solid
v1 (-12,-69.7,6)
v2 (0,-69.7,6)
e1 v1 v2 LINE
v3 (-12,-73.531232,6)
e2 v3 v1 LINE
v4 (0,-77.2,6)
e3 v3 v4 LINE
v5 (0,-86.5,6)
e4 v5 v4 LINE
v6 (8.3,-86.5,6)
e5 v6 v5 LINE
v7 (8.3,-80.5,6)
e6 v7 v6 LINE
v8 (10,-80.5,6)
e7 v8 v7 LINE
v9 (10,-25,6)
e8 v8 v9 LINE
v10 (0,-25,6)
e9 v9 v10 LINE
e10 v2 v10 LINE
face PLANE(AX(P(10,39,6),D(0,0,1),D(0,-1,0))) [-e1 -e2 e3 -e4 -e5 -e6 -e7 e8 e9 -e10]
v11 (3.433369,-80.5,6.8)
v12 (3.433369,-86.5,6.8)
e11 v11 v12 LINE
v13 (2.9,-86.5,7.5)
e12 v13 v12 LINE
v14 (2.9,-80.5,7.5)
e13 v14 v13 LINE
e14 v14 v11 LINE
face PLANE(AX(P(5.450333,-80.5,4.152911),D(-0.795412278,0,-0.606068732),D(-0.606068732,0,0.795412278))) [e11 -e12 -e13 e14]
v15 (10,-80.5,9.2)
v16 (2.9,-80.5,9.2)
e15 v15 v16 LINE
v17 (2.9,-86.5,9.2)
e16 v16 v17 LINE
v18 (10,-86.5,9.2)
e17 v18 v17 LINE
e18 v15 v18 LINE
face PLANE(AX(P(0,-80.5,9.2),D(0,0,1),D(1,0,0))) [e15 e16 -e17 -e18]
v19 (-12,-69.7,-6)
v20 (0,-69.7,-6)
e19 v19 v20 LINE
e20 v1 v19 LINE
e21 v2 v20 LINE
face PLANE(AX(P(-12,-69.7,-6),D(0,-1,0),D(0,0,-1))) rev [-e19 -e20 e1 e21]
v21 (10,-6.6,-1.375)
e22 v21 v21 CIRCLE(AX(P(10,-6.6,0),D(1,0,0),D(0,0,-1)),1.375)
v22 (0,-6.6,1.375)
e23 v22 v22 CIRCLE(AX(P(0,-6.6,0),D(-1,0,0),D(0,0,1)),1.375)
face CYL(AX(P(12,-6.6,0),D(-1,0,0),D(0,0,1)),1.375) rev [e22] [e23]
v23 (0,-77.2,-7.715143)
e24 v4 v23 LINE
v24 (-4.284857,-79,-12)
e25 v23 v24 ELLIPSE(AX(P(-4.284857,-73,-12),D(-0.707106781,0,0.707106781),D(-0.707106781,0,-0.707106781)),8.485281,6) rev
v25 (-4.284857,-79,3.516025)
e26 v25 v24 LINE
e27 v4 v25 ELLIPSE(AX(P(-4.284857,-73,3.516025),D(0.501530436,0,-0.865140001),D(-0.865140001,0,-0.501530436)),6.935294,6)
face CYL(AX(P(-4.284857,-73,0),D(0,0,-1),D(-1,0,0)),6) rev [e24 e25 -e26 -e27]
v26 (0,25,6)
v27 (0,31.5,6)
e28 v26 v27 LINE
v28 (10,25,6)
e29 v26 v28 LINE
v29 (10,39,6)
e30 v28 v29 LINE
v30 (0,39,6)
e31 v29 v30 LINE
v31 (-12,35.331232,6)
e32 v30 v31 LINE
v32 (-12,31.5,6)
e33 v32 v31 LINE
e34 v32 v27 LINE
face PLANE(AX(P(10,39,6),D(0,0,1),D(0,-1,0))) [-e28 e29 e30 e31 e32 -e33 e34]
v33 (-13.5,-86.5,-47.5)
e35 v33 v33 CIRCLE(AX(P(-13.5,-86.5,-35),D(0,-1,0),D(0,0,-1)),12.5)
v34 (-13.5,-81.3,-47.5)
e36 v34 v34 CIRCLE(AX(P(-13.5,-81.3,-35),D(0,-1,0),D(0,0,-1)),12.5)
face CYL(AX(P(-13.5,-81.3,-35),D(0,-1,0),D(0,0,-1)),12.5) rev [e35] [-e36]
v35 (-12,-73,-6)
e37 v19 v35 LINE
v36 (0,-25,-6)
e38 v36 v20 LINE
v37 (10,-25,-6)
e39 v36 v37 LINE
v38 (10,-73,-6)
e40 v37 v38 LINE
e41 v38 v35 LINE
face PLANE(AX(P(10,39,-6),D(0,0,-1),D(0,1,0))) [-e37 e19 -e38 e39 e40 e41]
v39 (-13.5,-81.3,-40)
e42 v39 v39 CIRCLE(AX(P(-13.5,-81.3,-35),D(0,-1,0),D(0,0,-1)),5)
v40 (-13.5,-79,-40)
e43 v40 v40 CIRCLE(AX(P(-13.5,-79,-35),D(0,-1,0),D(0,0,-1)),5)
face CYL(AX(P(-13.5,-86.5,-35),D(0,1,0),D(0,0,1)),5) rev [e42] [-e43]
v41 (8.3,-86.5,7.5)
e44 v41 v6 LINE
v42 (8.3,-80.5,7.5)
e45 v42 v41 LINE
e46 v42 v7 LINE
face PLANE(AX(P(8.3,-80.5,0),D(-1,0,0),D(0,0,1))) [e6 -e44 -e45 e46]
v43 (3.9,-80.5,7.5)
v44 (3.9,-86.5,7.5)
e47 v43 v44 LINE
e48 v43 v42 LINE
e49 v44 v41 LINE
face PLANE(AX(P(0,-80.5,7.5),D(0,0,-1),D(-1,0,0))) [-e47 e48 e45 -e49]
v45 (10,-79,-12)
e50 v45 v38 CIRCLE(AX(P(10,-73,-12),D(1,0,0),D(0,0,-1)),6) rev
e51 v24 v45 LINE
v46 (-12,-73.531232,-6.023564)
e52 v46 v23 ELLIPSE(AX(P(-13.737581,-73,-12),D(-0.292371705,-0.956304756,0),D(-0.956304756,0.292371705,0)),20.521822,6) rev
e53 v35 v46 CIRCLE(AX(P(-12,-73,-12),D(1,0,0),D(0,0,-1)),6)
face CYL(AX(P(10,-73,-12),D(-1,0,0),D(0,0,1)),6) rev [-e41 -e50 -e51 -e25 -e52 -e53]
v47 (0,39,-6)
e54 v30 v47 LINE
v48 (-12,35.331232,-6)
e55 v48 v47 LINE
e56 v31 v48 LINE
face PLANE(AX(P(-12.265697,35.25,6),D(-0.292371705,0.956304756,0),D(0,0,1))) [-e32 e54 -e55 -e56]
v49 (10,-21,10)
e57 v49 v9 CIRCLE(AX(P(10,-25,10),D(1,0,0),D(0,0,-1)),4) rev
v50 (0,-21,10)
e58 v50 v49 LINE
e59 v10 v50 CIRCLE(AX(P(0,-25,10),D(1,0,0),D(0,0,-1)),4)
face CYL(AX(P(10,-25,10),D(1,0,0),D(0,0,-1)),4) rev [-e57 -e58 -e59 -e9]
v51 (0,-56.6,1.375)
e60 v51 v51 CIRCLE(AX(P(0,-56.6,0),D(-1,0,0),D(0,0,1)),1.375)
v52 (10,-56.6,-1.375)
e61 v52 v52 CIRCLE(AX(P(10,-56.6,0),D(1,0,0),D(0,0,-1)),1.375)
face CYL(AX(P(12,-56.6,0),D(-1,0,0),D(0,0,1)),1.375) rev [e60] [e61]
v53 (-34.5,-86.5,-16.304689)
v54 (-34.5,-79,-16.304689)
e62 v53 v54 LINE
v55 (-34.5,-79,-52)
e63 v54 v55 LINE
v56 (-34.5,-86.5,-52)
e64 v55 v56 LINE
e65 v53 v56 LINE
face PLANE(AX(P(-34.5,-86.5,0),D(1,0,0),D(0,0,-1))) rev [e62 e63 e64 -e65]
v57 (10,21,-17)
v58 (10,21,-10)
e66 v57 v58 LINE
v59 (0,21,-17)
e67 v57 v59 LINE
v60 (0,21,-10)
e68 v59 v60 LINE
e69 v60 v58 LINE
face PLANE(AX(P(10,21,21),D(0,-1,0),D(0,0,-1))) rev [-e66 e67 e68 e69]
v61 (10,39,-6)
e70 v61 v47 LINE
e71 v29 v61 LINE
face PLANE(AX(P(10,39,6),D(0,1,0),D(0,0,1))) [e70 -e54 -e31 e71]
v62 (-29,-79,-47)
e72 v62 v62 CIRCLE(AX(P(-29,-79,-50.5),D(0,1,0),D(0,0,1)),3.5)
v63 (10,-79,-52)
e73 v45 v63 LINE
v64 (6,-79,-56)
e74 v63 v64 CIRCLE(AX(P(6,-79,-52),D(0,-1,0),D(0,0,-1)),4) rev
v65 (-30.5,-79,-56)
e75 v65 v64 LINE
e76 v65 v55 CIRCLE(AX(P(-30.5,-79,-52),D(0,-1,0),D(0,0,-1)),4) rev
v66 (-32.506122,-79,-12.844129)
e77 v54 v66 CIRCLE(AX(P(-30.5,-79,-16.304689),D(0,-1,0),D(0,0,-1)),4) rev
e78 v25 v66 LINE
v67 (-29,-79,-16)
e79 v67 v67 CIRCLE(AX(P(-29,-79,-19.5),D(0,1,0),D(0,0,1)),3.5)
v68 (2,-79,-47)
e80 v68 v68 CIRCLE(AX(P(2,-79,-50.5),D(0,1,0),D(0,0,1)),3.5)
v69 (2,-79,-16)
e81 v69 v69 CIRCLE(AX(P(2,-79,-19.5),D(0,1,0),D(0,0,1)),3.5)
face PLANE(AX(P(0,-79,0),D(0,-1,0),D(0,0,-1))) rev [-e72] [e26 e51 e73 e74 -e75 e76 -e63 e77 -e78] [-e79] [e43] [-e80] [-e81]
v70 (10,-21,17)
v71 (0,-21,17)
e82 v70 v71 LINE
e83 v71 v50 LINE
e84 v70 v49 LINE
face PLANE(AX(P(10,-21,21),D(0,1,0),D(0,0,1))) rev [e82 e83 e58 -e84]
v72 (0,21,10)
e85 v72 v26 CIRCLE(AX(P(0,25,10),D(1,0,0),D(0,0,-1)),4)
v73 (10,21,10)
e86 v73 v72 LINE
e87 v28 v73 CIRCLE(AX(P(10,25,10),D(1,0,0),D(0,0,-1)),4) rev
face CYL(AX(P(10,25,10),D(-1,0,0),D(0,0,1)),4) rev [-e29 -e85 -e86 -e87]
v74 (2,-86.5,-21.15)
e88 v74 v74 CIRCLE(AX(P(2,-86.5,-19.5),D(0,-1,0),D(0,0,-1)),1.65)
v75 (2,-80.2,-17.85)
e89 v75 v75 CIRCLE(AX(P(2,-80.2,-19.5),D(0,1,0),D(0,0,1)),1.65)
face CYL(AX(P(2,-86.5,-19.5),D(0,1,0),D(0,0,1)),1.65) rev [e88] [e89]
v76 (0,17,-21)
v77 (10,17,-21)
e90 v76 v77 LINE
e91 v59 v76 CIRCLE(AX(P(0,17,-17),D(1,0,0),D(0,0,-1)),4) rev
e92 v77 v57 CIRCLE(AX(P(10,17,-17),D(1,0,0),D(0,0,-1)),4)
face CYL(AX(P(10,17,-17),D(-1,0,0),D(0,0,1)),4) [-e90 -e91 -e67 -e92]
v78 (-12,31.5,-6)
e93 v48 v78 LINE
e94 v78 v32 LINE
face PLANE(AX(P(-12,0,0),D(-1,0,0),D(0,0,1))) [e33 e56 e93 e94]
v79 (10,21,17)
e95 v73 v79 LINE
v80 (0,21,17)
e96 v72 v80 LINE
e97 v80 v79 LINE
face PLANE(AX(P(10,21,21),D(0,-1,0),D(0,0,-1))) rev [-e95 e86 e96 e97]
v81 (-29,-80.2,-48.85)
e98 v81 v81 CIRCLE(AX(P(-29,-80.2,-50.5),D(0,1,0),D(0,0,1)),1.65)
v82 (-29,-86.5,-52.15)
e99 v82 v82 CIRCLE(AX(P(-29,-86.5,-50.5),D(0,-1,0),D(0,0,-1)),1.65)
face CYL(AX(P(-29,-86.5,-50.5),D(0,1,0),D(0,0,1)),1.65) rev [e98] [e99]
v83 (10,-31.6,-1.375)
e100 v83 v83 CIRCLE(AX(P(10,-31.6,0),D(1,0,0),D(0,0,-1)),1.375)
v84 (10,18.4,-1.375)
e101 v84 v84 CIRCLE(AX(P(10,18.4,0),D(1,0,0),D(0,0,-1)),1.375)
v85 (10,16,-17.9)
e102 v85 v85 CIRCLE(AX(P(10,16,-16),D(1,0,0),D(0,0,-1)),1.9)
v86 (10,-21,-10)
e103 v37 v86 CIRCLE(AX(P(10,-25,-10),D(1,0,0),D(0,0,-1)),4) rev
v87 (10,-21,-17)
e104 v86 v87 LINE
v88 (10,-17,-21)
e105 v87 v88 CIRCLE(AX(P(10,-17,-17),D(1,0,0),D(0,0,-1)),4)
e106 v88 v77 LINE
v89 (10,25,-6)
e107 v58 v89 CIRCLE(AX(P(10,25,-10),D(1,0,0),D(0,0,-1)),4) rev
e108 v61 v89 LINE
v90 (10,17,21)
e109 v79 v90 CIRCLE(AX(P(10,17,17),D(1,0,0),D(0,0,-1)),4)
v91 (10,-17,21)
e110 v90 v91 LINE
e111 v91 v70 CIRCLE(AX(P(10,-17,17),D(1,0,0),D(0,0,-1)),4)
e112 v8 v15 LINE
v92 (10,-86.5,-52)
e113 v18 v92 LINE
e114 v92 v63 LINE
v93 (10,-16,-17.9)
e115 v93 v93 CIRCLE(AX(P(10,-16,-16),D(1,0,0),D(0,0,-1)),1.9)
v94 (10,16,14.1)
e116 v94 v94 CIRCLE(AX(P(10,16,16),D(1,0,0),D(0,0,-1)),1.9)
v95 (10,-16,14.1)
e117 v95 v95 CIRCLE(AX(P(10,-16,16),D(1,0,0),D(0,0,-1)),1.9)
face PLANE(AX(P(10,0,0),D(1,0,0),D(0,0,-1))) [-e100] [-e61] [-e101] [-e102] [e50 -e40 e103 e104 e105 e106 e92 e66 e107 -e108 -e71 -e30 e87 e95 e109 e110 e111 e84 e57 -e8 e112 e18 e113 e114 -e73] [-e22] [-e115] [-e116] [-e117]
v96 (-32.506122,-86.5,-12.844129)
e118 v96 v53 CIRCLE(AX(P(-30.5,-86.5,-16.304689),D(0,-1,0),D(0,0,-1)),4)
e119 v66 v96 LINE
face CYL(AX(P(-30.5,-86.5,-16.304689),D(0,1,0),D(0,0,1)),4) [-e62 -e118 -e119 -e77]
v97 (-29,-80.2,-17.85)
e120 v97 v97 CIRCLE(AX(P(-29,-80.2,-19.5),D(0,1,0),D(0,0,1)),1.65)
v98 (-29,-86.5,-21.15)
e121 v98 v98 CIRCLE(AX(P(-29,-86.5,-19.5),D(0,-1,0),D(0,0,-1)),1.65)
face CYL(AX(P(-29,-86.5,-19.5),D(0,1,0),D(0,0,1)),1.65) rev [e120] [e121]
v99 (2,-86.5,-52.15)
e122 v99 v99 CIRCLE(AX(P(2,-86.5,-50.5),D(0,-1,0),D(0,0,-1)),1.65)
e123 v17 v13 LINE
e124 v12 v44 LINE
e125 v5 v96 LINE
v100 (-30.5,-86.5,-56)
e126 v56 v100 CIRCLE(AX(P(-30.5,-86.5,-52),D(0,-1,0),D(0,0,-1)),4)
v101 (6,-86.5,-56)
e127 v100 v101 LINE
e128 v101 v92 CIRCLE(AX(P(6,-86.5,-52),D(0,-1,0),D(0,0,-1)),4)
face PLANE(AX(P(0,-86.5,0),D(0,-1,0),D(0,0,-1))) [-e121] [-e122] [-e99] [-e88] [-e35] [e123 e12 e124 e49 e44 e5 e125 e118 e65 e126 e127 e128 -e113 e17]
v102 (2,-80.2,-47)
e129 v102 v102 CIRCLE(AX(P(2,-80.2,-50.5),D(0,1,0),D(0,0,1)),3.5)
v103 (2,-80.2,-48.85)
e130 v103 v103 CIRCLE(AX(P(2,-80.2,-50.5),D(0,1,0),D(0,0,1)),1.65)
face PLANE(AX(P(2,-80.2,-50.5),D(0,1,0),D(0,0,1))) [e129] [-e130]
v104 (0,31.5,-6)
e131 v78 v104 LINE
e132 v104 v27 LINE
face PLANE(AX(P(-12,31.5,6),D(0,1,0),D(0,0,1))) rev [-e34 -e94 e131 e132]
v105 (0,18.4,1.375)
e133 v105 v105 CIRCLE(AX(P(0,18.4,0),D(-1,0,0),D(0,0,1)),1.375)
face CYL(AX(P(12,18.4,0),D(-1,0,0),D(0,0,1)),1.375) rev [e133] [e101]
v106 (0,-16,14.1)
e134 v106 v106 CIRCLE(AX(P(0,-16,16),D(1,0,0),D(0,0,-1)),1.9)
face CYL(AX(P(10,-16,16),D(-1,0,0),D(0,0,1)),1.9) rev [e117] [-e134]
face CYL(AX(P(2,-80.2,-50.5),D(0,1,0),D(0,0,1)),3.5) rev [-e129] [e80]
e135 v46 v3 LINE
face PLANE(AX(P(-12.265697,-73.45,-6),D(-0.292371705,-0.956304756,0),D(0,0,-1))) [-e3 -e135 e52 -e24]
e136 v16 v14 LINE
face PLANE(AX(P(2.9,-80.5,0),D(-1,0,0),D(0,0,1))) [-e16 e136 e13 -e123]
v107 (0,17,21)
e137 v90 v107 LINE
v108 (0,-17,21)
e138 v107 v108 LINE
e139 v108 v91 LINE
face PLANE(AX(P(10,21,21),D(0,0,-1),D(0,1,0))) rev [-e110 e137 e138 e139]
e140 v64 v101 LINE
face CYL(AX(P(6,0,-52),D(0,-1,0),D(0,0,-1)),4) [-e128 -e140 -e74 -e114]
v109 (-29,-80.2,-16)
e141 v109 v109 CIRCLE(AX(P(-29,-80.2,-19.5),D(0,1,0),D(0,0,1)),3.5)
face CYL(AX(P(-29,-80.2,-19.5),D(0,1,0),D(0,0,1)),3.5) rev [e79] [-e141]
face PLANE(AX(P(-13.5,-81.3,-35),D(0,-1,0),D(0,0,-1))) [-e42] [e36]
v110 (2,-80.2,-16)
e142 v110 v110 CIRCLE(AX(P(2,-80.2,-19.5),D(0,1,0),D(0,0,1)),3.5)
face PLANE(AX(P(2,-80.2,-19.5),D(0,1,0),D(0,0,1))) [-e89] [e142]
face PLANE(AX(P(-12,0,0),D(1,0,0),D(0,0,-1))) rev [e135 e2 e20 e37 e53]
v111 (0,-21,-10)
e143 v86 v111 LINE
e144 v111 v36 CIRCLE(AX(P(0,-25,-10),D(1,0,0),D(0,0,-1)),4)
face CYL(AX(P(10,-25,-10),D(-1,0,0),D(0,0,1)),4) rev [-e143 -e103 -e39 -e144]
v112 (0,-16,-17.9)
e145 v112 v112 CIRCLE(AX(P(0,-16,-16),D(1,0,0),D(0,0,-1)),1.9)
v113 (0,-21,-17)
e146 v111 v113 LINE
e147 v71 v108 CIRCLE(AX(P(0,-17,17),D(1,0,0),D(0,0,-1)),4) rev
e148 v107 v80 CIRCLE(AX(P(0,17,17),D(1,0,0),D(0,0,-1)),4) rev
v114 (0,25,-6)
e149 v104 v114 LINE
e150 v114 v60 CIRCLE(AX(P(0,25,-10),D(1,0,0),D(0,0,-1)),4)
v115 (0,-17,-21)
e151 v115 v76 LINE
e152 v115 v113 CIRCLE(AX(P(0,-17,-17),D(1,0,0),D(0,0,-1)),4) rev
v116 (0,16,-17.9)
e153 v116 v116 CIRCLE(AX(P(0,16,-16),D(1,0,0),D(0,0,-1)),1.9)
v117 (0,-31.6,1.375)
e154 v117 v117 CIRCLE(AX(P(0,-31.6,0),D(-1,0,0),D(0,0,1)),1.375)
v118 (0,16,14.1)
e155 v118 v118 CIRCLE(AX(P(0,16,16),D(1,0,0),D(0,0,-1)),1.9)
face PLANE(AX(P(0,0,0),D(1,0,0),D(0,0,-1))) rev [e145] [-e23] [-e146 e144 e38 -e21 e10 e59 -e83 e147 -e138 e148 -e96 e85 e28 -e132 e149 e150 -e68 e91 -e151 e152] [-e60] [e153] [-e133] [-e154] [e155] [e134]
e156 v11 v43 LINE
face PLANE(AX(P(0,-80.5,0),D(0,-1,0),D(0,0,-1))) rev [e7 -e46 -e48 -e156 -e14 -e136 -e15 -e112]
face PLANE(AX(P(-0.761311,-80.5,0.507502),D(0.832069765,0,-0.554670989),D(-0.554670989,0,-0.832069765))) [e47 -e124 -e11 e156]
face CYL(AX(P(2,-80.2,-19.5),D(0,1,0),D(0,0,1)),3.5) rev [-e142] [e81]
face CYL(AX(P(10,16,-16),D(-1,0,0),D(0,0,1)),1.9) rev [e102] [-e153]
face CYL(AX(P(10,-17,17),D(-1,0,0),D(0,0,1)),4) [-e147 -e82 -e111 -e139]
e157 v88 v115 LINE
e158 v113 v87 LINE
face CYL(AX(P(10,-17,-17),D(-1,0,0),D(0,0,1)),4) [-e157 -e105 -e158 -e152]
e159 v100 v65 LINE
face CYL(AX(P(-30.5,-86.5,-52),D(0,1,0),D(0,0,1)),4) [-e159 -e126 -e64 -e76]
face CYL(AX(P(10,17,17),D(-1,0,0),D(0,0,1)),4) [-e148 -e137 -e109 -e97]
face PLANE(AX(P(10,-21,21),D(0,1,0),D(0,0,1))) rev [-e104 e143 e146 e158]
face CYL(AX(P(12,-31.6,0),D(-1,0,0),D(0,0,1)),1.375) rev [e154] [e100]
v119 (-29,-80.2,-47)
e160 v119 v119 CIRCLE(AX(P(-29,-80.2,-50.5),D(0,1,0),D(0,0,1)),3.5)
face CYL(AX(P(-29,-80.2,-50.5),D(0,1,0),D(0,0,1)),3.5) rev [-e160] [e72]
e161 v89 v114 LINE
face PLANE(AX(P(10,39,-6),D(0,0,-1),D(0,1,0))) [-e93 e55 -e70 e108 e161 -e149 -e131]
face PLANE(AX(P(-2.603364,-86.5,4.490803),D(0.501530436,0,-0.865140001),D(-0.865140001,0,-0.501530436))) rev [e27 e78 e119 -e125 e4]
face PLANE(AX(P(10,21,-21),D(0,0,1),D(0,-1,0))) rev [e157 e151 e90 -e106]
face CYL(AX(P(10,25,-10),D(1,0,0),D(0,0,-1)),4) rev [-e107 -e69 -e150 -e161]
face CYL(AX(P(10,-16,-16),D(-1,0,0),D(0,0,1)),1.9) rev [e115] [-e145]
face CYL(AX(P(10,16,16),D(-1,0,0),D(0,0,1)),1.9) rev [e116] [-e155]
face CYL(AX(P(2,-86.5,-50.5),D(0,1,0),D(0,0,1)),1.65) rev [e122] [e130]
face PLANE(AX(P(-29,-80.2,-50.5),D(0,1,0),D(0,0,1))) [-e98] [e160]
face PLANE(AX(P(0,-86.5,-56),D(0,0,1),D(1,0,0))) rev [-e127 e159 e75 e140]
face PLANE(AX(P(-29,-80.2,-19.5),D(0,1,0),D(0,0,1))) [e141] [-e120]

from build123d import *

# Parameters (mm, degrees)
SKETCH1_W           = 42
SKETCH1_H           = 42
SKETCH1_R           = 1.9
BOSS_EXTRUDE1_DEPTH = 10
SKETCH2_W           = 12
SKETCH2_H           = 118
BOSS_EXTRUDE2_DEPTH = 10
SKETCH3_W           = 12
SKETCH3_H           = 3.75
BOSS_EXTRUDE3_DEPTH = 12
CHAMFER1_SIZE       = 3.75
CHAMFER1_SIZE_2     = 12.265697319
SKETCH4_R           = 1.375
CUT_EXTRUDE1_DEPTH  = 12
SKETCH5_W           = 42
SKETCH5_H           = 42
SKETCH5_R           = 1.65
SKETCH5_R_2         = 5
BOSS_EXTRUDE4_DEPTH = 7.5
SKETCH6_R           = 12.5
CUT_EXTRUDE2_DEPTH  = 5.2
FILLET1_R           = 4
FILLET2_R           = 6
SKETCH8_R           = 3.5
CUT_EXTRUDE4_DEPTH  = 1.2
BOSS_EXTRUDE7_DEPTH = 6


with BuildPart() as part:
    # Sketch1 → Boss-Extrude1 (new body)
    with BuildSketch(Plane(origin=(0, 0, 0), x_dir=(0, 0, -1), z_dir=(1, 0, 0))):
        Rectangle(SKETCH1_W, SKETCH1_H)
        with Locations((16, -16)):
            Circle(SKETCH1_R, mode=Mode.SUBTRACT)
        with Locations((-16, -16)):
            Circle(SKETCH1_R, mode=Mode.SUBTRACT)
        with Locations((-16, 16)):
            Circle(SKETCH1_R, mode=Mode.SUBTRACT)
        with Locations((16, 16)):
            Circle(SKETCH1_R, mode=Mode.SUBTRACT)
    extrude(amount=BOSS_EXTRUDE1_DEPTH)

    # Sketch2 → Boss-Extrude2 (add)
    with BuildSketch(Plane.ZY):
        with Locations((0, -20)):
            Rectangle(SKETCH2_W, SKETCH2_H)
    extrude(amount=-BOSS_EXTRUDE2_DEPTH)

    # Sketch3 → Boss-Extrude3 (add)
    with BuildSketch(Plane.ZY):
        with Locations((0, 33.375)):
            Rectangle(SKETCH3_W, SKETCH3_H)
        with Locations((0, -71.575)):
            Rectangle(SKETCH3_W, SKETCH3_H)
    extrude(amount=BOSS_EXTRUDE3_DEPTH)

    # Chamfer1
    # the kernel refuses this chamfer: 12.265697319, 3.75 mm, written as the material it adds along each edge
    with BuildSketch(Plane(origin=(0, 35.25, -6), x_dir=(0.11964200288050787, 0.9928170985366542, 0), z_dir=(0, 0, 1))) as chamfer1_piece_1_section:
        Polygon((CHAMFER1_SIZE * 0.992817098537, CHAMFER1_SIZE * 0.119642002881), (-CHAMFER1_SIZE_2 * 0.119642002884, CHAMFER1_SIZE_2 * 0.992817098562), (0, 0), align=None)
    chamfer1_piece_1 = extrude(amount=12, mode=Mode.PRIVATE)
    chamfer1_piece_1 = split(chamfer1_piece_1, bisect_by=Plane(origin=(-4.172539525, 39, 0), z_dir=(0, -1, 0)), keep=Keep.TOP, mode=Mode.PRIVATE)
    chamfer1_piece_1 = split(chamfer1_piece_1, bisect_by=Plane(origin=(-12, 36.383581674, 0), z_dir=(1, 0, 0)), keep=Keep.TOP, mode=Mode.PRIVATE)
    add(chamfer1_piece_1)
    with BuildSketch(Plane(origin=(0, -73.45, -6), x_dir=(0.11964200288050787, -0.9928170985366542, 0), z_dir=(0, 0, 1))) as chamfer1_piece_2_section:
        Polygon((CHAMFER1_SIZE * 0.992817098537, -CHAMFER1_SIZE * 0.119642002881), (-CHAMFER1_SIZE_2 * 0.119642002884, -CHAMFER1_SIZE_2 * 0.992817098562), (0, 0), align=None)
    chamfer1_piece_2 = extrude(amount=12, mode=Mode.PRIVATE)
    chamfer1_piece_2 = split(chamfer1_piece_2, bisect_by=Plane(origin=(-12, -74.58994207, 0), z_dir=(1, 0, 0)), keep=Keep.TOP, mode=Mode.PRIVATE)
    add(chamfer1_piece_2)

    # Sketch4 → Cut-Extrude1 (cut)
    with BuildSketch(Plane.ZY):
        with Locations((0, 18.4)):
            Circle(SKETCH4_R)
        with Locations((0, -6.6)):
            Circle(SKETCH4_R)
        with Locations((0, -31.6)):
            Circle(SKETCH4_R)
        with Locations((0, -56.6)):
            Circle(SKETCH4_R)
    extrude(amount=-CUT_EXTRUDE1_DEPTH, mode=Mode.SUBTRACT)

    # Sketch5 → Boss-Extrude4 (add)
    # profile 1 of 2: a face of its own
    with BuildSketch(Plane.XZ.offset(79)):
        Polygon((10, -56), (10, 6), (0, 6), (-34.5, -14), (7.5, -14), (7.5, -56), align=None)
    # profile 2 of 2: a face of its own
    with BuildSketch(Plane.XZ.offset(79)):
        with Locations((-13.5, -35)):
            Rectangle(SKETCH5_W, SKETCH5_H)
        with Locations(Location((-29, -50.5, 0), (0, 0, 270))):
            Circle(SKETCH5_R, mode=Mode.SUBTRACT)
        with Locations(Location((-13.5, -35, 0), (0, 0, 270))):
            Circle(SKETCH5_R_2, mode=Mode.SUBTRACT)
        with Locations(Location((2, -50.5, 0), (0, 0, 270))):
            Circle(SKETCH5_R, mode=Mode.SUBTRACT)
        with Locations(Location((-29, -19.5, 0), (0, 0, 270))):
            Circle(SKETCH5_R, mode=Mode.SUBTRACT)
        with Locations(Location((2, -19.5, 0), (0, 0, 270))):
            Circle(SKETCH5_R, mode=Mode.SUBTRACT)
    extrude(amount=BOSS_EXTRUDE4_DEPTH)

    # Sketch6 → Cut-Extrude2 (cut)
    with BuildSketch(Plane.XZ.offset(86.5)):
        with Locations(Location((-13.5, -35, 0), (0, 0, 270))):
            Circle(SKETCH6_R)
    extrude(amount=-CUT_EXTRUDE2_DEPTH, mode=Mode.SUBTRACT)

    # Fillet1
    fillet1_edges = [part.edges().sort_by_distance(p)[0] for p in [
        (-34.5, -82.75, -56),
        (10, -82.75, -56),
        (-34.5, -82.75, -14),
        (5, -21, 6),
        (5, -21, -6),
        (5, 21, -6),
        (5, 21, 6),
        (5, -21, -21),
        (5, -21, 21),
        (5, 21, 21),
        (5, 21, -21),
    ]]
    fillet(fillet1_edges, radius=FILLET1_R)

    # Fillet2
    # the kernel refuses this fillet: 6 mm, written as the material it adds along each edge
    with BuildSketch(Plane(origin=(0, -79, -6), x_dir=(0, 1, 0), z_dir=(1, 0, 0))) as fillet2_piece_1_section:
        with BuildLine():
            CenterArc((FILLET2_R, -FILLET2_R), FILLET2_R, 90, 90)
            Line((0, -FILLET2_R), (-FILLET2_R * 0.02, -FILLET2_R))
            Line((-FILLET2_R * 0.02, -FILLET2_R), (-FILLET2_R * 0.02, FILLET2_R * 0.02))
            Line((-FILLET2_R * 0.02, FILLET2_R * 0.02), (FILLET2_R, FILLET2_R * 0.02))
            Line((FILLET2_R, FILLET2_R * 0.02), (FILLET2_R, 0))
        make_face()
    fillet2_piece_1 = extrude(amount=10, mode=Mode.PRIVATE)
    fillet2_piece_1 = split(fillet2_piece_1, bisect_by=Plane(origin=(2.499298027, -77.964112089, -8.062690797), z_dir=(-0.29237170472287155, -0.9563047559629945, 0)), keep=Keep.TOP, mode=Mode.PRIVATE)
    add(fillet2_piece_1)
    with BuildSketch(Plane(origin=(-15, -79, -6), x_dir=(0, 1, 0), z_dir=(1, 0, 0))) as fillet2_piece_2_section:
        with BuildLine():
            CenterArc((FILLET2_R, -FILLET2_R), FILLET2_R, 90, 90)
            Line((0, -FILLET2_R), (-FILLET2_R * 0.02, -FILLET2_R))
            Line((-FILLET2_R * 0.02, -FILLET2_R), (-FILLET2_R * 0.02, FILLET2_R * 0.02))
            Line((-FILLET2_R * 0.02, FILLET2_R * 0.02), (FILLET2_R, FILLET2_R * 0.02))
            Line((FILLET2_R, FILLET2_R * 0.02), (FILLET2_R, 0))
        make_face()
    fillet2_piece_2 = extrude(amount=25, mode=Mode.PRIVATE)
    fillet2_piece_2 = split(fillet2_piece_2, bisect_by=Plane(origin=(-12, -75.195203729, -6.203668613), z_dir=(1, 0, 0)), keep=Keep.TOP, mode=Mode.PRIVATE)
    fillet2_piece_2 = split(fillet2_piece_2, bisect_by=Plane(origin=(-3.530108064, -76.120737656, -6.203668613), z_dir=(0.29237170472287155, 0.9563047559629945, 0)), keep=Keep.TOP, mode=Mode.PRIVATE)
    fillet2_piece_2 = split(fillet2_piece_2, bisect_by=Plane(origin=(0, -75.195203729, -6.203668613), z_dir=(-1, 0, 0)), keep=Keep.TOP, mode=Mode.PRIVATE)
    add(fillet2_piece_2)
    with BuildSketch(Plane(origin=(0, -79, -6), x_dir=(0, 1, 0), z_dir=(1, 0, 0))) as fillet2_piece_3_section:
        with BuildLine():
            CenterArc((FILLET2_R, -FILLET2_R), FILLET2_R, 90, 90)
            Line((0, -FILLET2_R), (-FILLET2_R * 0.02, -FILLET2_R))
            Line((-FILLET2_R * 0.02, -FILLET2_R), (-FILLET2_R * 0.02, FILLET2_R * 0.02))
            Line((-FILLET2_R * 0.02, FILLET2_R * 0.02), (FILLET2_R, FILLET2_R * 0.02))
            Line((FILLET2_R, FILLET2_R * 0.02), (FILLET2_R, 0))
        make_face()
    fillet2_piece_3 = extrude(amount=10, mode=Mode.PRIVATE)
    fillet2_piece_3 = split(fillet2_piece_3, bisect_by=Plane(origin=(5.482207423, -78.876079011, -7.106323333), z_dir=(0.29237170472287155, 0.9563047559629945, 0)), keep=Keep.TOP, mode=Mode.PRIVATE)
    add(fillet2_piece_3)
    with BuildSketch(Plane(origin=(0, -79, -6), x_dir=(-1, 0, 0), z_dir=(0, 0, 1))) as fillet2_piece_4_section:
        with BuildLine():
            CenterArc((4.284857057, -6), FILLET2_R, 90, 45.572995999)
            Line((0, -1.8), (-0.085697141, -1.716))
            ThreePointArc((-0.085697141, -1.716), (-0.12, -0.9), (-0.12, 0))
            Line((-0.12, 0), (0, 0.12))
            Line((0, 0.12), (4.284857057, 0.12))
            Line((4.284857057, 0.12), (4.284857057, 0))
        make_face()
    fillet2_piece_4 = extrude(amount=12, mode=Mode.PRIVATE)
    fillet2_piece_4 = split(fillet2_piece_4, bisect_by=Plane(origin=(-3.559533533, -78.541465105, 3.936502299), z_dir=(0.5015304356318926, 0, -0.8651400014650138)), keep=Keep.TOP, mode=Mode.PRIVATE)
    add(fillet2_piece_4)
    with BuildSketch(Plane(origin=(-15, -79, -6), x_dir=(0, 1, 0), z_dir=(1, 0, 0))) as fillet2_piece_5a_section:
        with BuildLine():
            CenterArc((FILLET2_R, -FILLET2_R), FILLET2_R, 90, 90)
            Line((0, -FILLET2_R), (-FILLET2_R * 0.02, -FILLET2_R))
            Line((-FILLET2_R * 0.02, -FILLET2_R), (-FILLET2_R * 0.02, FILLET2_R * 0.02))
            Line((-FILLET2_R * 0.02, FILLET2_R * 0.02), (FILLET2_R, FILLET2_R * 0.02))
            Line((FILLET2_R, FILLET2_R * 0.02), (FILLET2_R, 0))
        make_face()
    fillet2_piece_5a = extrude(amount=25, mode=Mode.PRIVATE)
    fillet2_piece_5a = split(fillet2_piece_5a, bisect_by=Plane(origin=(-12, -77.909616739, -7.484859566), z_dir=(1, 0, 0)), keep=Keep.TOP, mode=Mode.PRIVATE)
    fillet2_piece_5a = split(fillet2_piece_5a, bisect_by=Plane(origin=(-5.56448371, -75.498766603, -7.484859566), z_dir=(-0.29237170472287155, -0.9563047559629945, 0)), keep=Keep.TOP, mode=Mode.PRIVATE)
    fillet2_piece_5a = split(fillet2_piece_5a, bisect_by=Plane(origin=(0, -77.909616739, -7.484859566), z_dir=(-1, 0, 0)), keep=Keep.TOP, mode=Mode.PRIVATE)
    with BuildSketch(Plane(origin=(0, -79, -16.712142643), x_dir=(-1, 0, 0), z_dir=(0, 0, 1))) as fillet2_piece_5b_section:
        with BuildLine():
            CenterArc((4.284857057, -6), FILLET2_R, 90, 45.572995999)
            Line((0, -1.8), (-0.085697141, -1.716))
            ThreePointArc((-0.085697141, -1.716), (-0.12, -0.9), (-0.12, 0))
            Line((-0.12, 0), (0, 0.12))
            Line((0, 0.12), (4.284857057, 0.12))
            Line((4.284857057, 0.12), (4.284857057, 0))
        make_face()
    fillet2_piece_5b = extrude(amount=22.712142643, mode=Mode.PRIVATE)
    fillet2_piece_5b = split(fillet2_piece_5b, bisect_by=Plane(origin=(-1.145977821, -78.554932171, -6), z_dir=(0, 0, -1)), keep=Keep.TOP, mode=Mode.PRIVATE)
    fillet2_piece_5 = fillet2_piece_5a & fillet2_piece_5b
    add(fillet2_piece_5)

    # Sketch8 → Cut-Extrude4 (cut)
    with BuildSketch(Plane(origin=(0, -79, 0), x_dir=(1, 0, 0), z_dir=(0, 1, 0))):
        with Locations(Location((-29, 50.5, 0), (0, 0, 270))):
            Circle(SKETCH8_R)
        with Locations(Location((2, 50.5, 0), (0, 0, 270))):
            Circle(SKETCH8_R)
        with Locations(Location((2, 19.5, 0), (0, 0, 270))):
            Circle(SKETCH8_R)
        with Locations(Location((-29, 19.5, 0), (0, 0, 270))):
            Circle(SKETCH8_R)
    extrude(amount=-CUT_EXTRUDE4_DEPTH, mode=Mode.SUBTRACT)

    # Sketch11 → Boss-Extrude7 (add)
    with BuildSketch(Plane.XZ.offset(86.5)):
        Polygon((8.3, 6), (10, 6), (10, 9.2), (2.9, 9.2), (2.9, 7.5), (3.9, 7.5), (8.3, 7.5), align=None)
        Polygon((3.9, 7.5), (2.9, 7.5), (3.433368825, 6.8), align=None)
    extrude(amount=-BOSS_EXTRUDE7_DEPTH)


solid = part.part
